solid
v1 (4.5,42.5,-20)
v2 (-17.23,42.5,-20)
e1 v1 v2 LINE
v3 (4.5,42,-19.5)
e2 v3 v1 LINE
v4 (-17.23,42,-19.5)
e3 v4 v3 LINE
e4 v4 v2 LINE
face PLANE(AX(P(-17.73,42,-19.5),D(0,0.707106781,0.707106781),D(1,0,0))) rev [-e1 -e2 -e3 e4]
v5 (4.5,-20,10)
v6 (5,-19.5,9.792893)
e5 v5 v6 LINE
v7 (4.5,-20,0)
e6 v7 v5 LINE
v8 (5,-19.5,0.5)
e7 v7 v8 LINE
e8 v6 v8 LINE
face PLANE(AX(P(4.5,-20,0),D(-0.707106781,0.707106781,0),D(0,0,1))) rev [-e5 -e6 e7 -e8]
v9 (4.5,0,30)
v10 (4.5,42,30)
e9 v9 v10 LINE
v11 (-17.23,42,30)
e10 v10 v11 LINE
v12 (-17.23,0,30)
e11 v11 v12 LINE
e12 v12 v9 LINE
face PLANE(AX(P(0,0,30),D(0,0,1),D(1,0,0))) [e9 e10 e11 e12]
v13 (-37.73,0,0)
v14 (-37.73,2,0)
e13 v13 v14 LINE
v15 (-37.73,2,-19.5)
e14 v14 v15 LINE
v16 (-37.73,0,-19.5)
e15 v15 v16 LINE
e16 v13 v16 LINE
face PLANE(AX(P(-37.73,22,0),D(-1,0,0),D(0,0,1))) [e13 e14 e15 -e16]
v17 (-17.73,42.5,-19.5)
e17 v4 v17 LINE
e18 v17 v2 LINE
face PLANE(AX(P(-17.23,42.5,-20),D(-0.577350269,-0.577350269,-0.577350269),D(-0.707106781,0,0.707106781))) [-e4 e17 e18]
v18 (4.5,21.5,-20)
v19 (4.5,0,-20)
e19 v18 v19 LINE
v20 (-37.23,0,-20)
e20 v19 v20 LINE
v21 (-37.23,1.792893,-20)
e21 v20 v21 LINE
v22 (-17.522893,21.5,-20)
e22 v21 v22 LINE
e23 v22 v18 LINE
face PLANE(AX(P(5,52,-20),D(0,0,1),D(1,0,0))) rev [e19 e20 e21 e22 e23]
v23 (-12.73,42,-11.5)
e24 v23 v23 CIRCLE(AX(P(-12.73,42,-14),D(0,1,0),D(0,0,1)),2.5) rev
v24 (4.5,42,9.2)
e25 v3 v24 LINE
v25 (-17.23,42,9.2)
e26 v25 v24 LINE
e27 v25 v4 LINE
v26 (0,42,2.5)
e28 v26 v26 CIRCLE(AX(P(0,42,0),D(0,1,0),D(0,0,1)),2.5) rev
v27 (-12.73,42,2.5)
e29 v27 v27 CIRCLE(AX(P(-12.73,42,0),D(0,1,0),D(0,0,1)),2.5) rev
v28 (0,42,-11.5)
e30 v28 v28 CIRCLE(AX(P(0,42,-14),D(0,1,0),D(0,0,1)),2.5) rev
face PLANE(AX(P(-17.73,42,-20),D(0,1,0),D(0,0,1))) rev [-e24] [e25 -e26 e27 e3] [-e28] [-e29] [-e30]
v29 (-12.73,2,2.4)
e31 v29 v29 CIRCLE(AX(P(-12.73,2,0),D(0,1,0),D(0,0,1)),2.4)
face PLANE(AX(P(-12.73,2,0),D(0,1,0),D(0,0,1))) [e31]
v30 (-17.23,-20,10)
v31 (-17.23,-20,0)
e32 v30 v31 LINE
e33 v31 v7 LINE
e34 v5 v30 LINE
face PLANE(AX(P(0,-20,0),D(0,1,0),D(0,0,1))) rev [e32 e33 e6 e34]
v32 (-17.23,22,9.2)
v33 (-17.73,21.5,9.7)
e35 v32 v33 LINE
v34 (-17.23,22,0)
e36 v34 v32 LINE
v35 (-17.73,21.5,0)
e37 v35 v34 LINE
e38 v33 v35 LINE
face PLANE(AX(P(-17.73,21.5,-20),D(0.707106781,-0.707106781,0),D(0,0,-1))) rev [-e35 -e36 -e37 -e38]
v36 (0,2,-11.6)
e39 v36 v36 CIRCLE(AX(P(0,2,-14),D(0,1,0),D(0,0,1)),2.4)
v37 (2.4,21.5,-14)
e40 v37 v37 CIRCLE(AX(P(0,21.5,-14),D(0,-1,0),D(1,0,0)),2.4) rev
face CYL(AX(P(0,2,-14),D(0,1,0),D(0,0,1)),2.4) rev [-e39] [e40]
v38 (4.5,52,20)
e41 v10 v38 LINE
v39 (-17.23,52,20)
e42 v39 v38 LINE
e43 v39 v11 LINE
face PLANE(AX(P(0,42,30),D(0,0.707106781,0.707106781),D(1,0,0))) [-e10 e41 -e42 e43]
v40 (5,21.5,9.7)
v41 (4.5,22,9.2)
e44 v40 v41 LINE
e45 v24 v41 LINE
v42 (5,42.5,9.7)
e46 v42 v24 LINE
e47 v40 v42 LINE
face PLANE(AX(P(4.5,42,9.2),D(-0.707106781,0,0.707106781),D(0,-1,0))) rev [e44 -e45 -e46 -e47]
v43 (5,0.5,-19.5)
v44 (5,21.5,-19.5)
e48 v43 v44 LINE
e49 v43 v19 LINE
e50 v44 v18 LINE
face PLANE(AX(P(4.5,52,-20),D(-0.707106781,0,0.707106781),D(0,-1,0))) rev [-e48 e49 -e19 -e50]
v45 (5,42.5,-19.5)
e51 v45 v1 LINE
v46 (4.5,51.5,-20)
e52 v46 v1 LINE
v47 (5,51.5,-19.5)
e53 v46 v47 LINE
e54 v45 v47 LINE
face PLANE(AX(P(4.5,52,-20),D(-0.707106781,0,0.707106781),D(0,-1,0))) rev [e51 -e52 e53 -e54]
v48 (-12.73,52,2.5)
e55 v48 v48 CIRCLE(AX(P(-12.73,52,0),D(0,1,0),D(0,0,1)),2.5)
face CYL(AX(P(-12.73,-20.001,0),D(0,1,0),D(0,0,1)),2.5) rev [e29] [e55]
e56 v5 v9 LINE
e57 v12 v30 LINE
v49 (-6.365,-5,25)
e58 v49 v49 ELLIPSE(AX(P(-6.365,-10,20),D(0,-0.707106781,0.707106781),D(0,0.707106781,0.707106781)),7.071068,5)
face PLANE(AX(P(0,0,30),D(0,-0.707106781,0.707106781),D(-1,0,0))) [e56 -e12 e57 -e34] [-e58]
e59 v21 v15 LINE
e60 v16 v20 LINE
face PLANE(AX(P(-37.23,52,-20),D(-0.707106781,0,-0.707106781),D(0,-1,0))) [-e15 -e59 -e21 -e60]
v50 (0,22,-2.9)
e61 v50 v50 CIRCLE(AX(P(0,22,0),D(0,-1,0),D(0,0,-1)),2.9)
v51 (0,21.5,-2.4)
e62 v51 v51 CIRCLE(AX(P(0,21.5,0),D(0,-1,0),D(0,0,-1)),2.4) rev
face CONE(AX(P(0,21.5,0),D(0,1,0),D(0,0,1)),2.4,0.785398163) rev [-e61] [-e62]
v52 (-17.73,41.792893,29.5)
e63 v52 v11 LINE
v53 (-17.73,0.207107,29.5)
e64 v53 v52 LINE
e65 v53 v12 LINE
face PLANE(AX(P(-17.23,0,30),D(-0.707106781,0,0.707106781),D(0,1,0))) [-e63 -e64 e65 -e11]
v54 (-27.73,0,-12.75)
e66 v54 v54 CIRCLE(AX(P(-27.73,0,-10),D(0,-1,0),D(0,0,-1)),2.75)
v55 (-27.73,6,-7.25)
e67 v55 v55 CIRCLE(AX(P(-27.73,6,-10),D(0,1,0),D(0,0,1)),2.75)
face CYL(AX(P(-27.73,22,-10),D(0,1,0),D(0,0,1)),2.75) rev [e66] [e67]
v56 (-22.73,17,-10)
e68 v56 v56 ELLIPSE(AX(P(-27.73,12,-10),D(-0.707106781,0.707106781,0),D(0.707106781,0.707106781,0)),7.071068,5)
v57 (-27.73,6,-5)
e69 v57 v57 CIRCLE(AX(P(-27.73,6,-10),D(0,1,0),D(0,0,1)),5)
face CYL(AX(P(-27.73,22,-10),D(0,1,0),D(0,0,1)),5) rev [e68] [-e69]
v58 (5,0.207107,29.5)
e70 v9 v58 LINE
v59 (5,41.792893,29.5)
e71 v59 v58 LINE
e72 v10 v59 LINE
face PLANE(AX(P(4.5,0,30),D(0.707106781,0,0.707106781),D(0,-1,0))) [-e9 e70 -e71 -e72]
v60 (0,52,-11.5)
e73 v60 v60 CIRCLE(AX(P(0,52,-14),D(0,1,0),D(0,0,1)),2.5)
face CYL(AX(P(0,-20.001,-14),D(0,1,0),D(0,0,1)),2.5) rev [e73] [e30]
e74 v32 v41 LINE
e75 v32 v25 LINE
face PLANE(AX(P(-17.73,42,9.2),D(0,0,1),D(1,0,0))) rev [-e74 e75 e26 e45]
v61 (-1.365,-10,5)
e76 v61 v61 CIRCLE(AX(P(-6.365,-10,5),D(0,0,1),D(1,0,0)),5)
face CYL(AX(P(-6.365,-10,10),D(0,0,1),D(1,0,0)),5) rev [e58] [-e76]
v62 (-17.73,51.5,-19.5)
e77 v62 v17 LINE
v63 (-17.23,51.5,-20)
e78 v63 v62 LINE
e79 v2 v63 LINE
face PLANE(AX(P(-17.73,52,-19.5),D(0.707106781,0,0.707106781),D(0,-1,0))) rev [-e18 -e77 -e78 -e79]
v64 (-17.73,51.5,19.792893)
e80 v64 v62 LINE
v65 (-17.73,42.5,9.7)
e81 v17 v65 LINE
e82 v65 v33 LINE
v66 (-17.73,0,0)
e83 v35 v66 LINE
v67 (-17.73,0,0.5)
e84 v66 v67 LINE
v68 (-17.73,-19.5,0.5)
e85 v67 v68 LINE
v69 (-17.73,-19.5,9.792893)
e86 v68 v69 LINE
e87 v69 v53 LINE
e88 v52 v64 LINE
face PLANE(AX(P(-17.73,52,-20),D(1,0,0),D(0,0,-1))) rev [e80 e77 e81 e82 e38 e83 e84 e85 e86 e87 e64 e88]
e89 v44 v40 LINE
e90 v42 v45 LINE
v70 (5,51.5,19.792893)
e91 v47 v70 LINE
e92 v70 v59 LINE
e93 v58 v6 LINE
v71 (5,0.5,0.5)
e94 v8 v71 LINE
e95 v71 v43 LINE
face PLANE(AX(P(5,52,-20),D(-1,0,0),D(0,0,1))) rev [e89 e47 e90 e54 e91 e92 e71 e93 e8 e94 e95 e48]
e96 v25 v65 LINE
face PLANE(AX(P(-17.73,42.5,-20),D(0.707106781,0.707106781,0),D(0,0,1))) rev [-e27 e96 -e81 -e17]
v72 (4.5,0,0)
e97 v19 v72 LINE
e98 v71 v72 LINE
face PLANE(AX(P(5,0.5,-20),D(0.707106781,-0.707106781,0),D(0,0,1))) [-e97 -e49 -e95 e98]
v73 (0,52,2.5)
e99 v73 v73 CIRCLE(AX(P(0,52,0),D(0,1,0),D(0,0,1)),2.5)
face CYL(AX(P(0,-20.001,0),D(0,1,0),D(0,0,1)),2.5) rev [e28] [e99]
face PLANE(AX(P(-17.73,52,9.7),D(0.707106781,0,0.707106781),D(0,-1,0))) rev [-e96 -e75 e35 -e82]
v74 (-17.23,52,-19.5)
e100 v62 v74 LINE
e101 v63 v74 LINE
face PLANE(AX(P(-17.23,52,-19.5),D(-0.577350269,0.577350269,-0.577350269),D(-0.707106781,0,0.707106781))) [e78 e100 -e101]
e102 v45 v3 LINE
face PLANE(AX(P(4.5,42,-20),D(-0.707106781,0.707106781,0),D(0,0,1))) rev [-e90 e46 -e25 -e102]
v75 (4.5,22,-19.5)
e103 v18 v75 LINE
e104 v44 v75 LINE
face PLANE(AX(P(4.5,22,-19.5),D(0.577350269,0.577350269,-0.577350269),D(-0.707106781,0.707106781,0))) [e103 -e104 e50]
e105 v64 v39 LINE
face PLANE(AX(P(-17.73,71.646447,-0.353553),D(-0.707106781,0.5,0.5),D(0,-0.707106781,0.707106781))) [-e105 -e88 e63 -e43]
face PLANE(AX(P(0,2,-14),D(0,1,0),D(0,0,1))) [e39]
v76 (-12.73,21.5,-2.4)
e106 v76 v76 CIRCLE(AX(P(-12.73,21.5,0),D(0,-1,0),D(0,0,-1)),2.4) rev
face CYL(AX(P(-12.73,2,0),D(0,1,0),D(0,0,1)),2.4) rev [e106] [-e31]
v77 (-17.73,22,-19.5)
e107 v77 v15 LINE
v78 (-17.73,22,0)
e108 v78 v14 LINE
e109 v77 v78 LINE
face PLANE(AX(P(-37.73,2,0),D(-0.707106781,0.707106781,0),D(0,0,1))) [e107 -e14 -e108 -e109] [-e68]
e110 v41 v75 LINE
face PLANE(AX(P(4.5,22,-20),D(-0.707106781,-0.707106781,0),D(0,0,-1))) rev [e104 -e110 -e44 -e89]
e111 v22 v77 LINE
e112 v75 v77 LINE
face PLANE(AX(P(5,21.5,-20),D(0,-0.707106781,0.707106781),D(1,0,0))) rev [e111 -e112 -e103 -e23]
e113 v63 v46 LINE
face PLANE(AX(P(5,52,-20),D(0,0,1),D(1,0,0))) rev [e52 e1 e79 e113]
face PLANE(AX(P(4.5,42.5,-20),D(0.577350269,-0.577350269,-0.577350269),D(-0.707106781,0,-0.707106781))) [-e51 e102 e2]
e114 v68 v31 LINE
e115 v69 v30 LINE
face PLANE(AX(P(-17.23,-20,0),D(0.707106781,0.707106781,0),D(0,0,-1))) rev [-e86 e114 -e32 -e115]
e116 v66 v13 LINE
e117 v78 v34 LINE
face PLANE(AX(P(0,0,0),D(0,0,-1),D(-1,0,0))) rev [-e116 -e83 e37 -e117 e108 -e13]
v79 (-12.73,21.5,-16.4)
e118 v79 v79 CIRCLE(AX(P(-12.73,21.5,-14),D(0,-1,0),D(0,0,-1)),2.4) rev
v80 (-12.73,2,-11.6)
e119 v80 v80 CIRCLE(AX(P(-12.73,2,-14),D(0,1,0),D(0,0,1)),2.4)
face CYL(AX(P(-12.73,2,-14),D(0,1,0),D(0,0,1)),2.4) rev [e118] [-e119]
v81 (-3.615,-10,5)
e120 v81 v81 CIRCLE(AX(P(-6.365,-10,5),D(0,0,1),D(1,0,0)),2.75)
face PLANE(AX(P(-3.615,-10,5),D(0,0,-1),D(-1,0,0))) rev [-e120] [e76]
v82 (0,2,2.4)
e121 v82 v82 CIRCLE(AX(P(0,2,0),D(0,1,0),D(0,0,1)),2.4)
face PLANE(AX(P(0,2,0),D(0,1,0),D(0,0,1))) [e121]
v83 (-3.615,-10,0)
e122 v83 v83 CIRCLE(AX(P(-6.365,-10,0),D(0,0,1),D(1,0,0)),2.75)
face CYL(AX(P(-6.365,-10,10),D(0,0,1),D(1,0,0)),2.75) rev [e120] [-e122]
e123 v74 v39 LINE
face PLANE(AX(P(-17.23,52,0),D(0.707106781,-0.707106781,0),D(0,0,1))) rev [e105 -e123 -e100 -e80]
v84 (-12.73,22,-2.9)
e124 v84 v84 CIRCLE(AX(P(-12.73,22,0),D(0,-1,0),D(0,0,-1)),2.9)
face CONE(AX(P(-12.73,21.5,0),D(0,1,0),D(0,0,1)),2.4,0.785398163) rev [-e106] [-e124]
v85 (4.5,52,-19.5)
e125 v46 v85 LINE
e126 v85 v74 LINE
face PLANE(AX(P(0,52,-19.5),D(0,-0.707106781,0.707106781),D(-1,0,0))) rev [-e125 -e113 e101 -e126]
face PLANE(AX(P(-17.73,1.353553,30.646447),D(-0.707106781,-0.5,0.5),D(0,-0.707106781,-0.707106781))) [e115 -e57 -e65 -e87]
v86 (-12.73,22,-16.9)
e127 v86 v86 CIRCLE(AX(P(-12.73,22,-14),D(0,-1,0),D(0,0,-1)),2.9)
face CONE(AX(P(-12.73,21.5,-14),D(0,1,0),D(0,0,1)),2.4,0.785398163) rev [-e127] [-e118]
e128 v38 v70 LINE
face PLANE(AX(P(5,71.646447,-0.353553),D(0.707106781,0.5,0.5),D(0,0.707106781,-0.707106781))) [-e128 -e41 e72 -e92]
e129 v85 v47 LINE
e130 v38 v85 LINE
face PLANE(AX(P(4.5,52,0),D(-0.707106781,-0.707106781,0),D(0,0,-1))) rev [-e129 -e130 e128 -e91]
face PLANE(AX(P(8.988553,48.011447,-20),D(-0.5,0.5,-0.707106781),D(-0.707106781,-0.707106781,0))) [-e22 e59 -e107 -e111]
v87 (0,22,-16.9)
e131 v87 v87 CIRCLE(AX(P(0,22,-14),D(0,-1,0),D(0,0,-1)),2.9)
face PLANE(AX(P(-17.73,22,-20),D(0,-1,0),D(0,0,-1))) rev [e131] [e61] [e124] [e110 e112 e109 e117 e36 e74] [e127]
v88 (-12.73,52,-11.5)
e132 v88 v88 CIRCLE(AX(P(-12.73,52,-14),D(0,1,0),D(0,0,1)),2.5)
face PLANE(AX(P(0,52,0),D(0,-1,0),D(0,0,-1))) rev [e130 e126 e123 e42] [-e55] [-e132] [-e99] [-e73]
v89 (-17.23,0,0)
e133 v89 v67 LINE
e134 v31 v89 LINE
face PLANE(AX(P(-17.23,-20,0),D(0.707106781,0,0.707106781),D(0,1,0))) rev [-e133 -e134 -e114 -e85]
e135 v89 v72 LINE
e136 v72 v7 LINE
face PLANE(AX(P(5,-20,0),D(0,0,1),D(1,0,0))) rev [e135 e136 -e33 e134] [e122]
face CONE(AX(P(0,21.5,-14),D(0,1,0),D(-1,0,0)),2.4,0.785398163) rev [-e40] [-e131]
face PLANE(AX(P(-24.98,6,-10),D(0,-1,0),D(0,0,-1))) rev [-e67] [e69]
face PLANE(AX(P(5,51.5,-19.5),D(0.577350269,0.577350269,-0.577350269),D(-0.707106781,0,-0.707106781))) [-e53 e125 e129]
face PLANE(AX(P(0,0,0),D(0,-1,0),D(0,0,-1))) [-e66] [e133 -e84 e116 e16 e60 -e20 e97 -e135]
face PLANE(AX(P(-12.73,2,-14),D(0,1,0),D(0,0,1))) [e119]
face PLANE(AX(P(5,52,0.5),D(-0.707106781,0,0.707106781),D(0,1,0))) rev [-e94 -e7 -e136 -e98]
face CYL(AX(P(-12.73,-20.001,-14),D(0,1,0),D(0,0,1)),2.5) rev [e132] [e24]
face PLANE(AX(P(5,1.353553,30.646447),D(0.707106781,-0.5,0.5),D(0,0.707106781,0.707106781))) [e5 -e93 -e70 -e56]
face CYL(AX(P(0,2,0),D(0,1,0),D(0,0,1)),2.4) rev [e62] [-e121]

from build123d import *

# Parameters (mm, degrees)
SKETCH2_W                      = 22.73
SKETCH2_H                      = 30
BOSS_EXTRUDE1_DEPTH            = 52
SKETCH3_W                      = 22.73
SKETCH3_H                      = 10
BOSS_EXTRUDE2_DEPTH            = 20
CBORE_FOR_M5_SHCS1_D           = 5.5
CBORE_FOR_M5_SHCS1_CBORE_D     = 10
CBORE_FOR_M5_SHCS1_CBORE_DEPTH = 5
BOSS_EXTRUDE3_START            = 20
SKETCH7_W                      = 22.73
SKETCH7_H                      = 72
SKETCH7_R                      = 5
BOSS_EXTRUDE3_DEPTH            = 20
SKETCH8_W                      = 29.2
SKETCH8_H                      = 20
CUT_EXTRUDE1_DEPTH             = 65.192311845
CUT_EXTRUDE2_REACH             = 81.99
SKETCH9_R                      = 2.5
SKETCH10_R                     = 2.4
CUT_EXTRUDE3_DEPTH             = 20
SKETCH12_W                     = 20
SKETCH12_H                     = 22
BOSS_EXTRUDE5_DEPTH            = 20
CBORE_FOR_M5_SHCS2_D           = 5.5
CBORE_FOR_M5_SHCS2_CBORE_D     = 10
CBORE_FOR_M5_SHCS2_CBORE_DEPTH = 16
CHAMFER1_SIZE                  = 20
CHAMFER3_SIZE                  = 10
CHAMFER2_SIZE                  = 0.5


with BuildPart() as part:
    # Sketch2 → Boss-Extrude1 (new body)
    with BuildSketch(Plane(origin=(0, 0, 0), x_dir=(1, 0, 0), z_dir=(0, 1, 0))):
        with Locations((-6.365, 5)):
            Rectangle(SKETCH2_W, SKETCH2_H)
    extrude(amount=BOSS_EXTRUDE1_DEPTH)

    # Sketch3 → Boss-Extrude2 (add)
    with BuildSketch(Plane.XZ):
        with Locations((-6.365, 5)):
            Rectangle(SKETCH3_W, SKETCH3_H)
    extrude(amount=BOSS_EXTRUDE2_DEPTH)

    # CBORE for M5 SHCS1 (through all)
    with Locations(Plane.XY.offset(10)):
        with Locations((-6.365, -10)):
            CounterBoreHole(CBORE_FOR_M5_SHCS1_D / 2, CBORE_FOR_M5_SHCS1_CBORE_D / 2, CBORE_FOR_M5_SHCS1_CBORE_DEPTH)

    # Sketch7 → Boss-Extrude3 (add)
    with BuildSketch(Plane.XY.offset(10).offset(BOSS_EXTRUDE3_START)):
        with Locations((-6.365, 16)):
            Rectangle(SKETCH7_W, SKETCH7_H)
        with Locations((-6.365, -10)):
            Circle(SKETCH7_R, mode=Mode.SUBTRACT)
    extrude(amount=-BOSS_EXTRUDE3_DEPTH)

    # Sketch8 → Cut-Extrude1 (cut, through all)
    with BuildSketch(Plane(origin=(5, 0, 0), x_dir=(0, 0, -1), z_dir=(1, 0, 0))):
        with Locations((5.4, 32)):
            Rectangle(SKETCH8_W, SKETCH8_H)
    extrude(amount=-CUT_EXTRUDE1_DEPTH, mode=Mode.SUBTRACT)

    # Sketch9 → Cut-Extrude2 (cut, up to next)
    with BuildSketch(Plane(origin=(0, 52, 0), x_dir=(1, 0, 0), z_dir=(0, 1, 0)), mode=Mode.PRIVATE) as cut_extrude2_sk1:
        with Locations(Location((-12.73, 0, 0), (0, 0, 270))):
            Circle(SKETCH9_R)
    cut_extrude2_tool1 = extrude(cut_extrude2_sk1.sketch, amount=-CUT_EXTRUDE2_REACH, mode=Mode.PRIVATE) & part.part
    # Sketch9 → Cut-Extrude2 (cut, up to next)
    with BuildSketch(Plane(origin=(0, 52, 0), x_dir=(1, 0, 0), z_dir=(0, 1, 0)), mode=Mode.PRIVATE) as cut_extrude2_sk2:
        with Locations(Location((0, 14, 0), (0, 0, 270))):
            Circle(SKETCH9_R)
    cut_extrude2_tool2 = extrude(cut_extrude2_sk2.sketch, amount=-CUT_EXTRUDE2_REACH, mode=Mode.PRIVATE) & part.part
    # Sketch9 → Cut-Extrude2 (cut, up to next)
    with BuildSketch(Plane(origin=(0, 52, 0), x_dir=(1, 0, 0), z_dir=(0, 1, 0)), mode=Mode.PRIVATE) as cut_extrude2_sk3:
        with Locations(Location((-12.73, 14, 0), (0, 0, 270))):
            Circle(SKETCH9_R)
    cut_extrude2_tool3 = extrude(cut_extrude2_sk3.sketch, amount=-CUT_EXTRUDE2_REACH, mode=Mode.PRIVATE) & part.part
    # Sketch9 → Cut-Extrude2 (cut, up to next)
    with BuildSketch(Plane(origin=(0, 52, 0), x_dir=(1, 0, 0), z_dir=(0, 1, 0)), mode=Mode.PRIVATE) as cut_extrude2_sk4:
        with Locations(Location((0, 0, 0), (0, 0, 270))):
            Circle(SKETCH9_R)
    cut_extrude2_tool4 = extrude(cut_extrude2_sk4.sketch, amount=-CUT_EXTRUDE2_REACH, mode=Mode.PRIVATE) & part.part
    add(cut_extrude2_tool1.solids().sort_by_distance((-12.73, 52, 0))[0], mode=Mode.SUBTRACT)
    add(cut_extrude2_tool2.solids().sort_by_distance((0, 52, -14))[0], mode=Mode.SUBTRACT)
    add(cut_extrude2_tool3.solids().sort_by_distance((-12.73, 52, -14))[0], mode=Mode.SUBTRACT)
    add(cut_extrude2_tool4.solids().sort_by_distance((0, 52, 0))[0], mode=Mode.SUBTRACT)

    # Sketch10 → Cut-Extrude3 (cut)
    with BuildSketch(Plane(origin=(0, 22, 0), x_dir=(1, 0, 0), z_dir=(0, 1, 0))):
        with Locations(Location((0, 0, 0), (0, 0, 270))):
            Circle(SKETCH10_R)
        with Locations(Location((-12.73, 0, 0), (0, 0, 270))):
            Circle(SKETCH10_R)
        with Locations(Location((-12.73, 14, 0), (0, 0, 270))):
            Circle(SKETCH10_R)
        with Locations(Location((0, 14, 0), (0, 0, 270))):
            Circle(SKETCH10_R)
    extrude(amount=-CUT_EXTRUDE3_DEPTH, mode=Mode.SUBTRACT)

    # Sketch12 → Boss-Extrude5 (add)
    with BuildSketch(Plane(origin=(0, 0, -20), x_dir=(-1, 0, 0), z_dir=(0, 0, -1))):
        with Locations((27.73, 11)):
            Rectangle(SKETCH12_W, SKETCH12_H)
    extrude(amount=-BOSS_EXTRUDE5_DEPTH)

    # CBORE for M5 SHCS2 (through all)
    with Locations(Plane(origin=(0, 22, 0), x_dir=(1, 0, 0), z_dir=(0, 1, 0))):
        with Locations((-27.73, 10)):
            CounterBoreHole(CBORE_FOR_M5_SHCS2_D / 2, CBORE_FOR_M5_SHCS2_CBORE_D / 2, CBORE_FOR_M5_SHCS2_CBORE_DEPTH)

    # Chamfer1
    # the kernel refuses this chamfer: 20 mm, written as the material it takes off along each edge
    with BuildSketch(Plane(origin=(-69.163659759, -20, 30), x_dir=(0, 0.9996219169112968, 0.027495876610586317), z_dir=(1, 0, 0))) as chamfer1_piece_1:
        Polygon((CHAMFER1_SIZE * 0.999621916911, -CHAMFER1_SIZE * 0.0274958766106), (-CHAMFER1_SIZE * 0.0274958766106, -CHAMFER1_SIZE * 0.999621916911), (0, 0), align=None)
    extrude(amount=125.597319519, mode=Mode.SUBTRACT)
    with BuildSketch(Plane(origin=(-37.73, 22, -71.433659759), x_dir=(0.9996219169112968, 0.027495876610586317, 0), z_dir=(0, 0, 1))) as chamfer1_piece_2:
        Polygon((CHAMFER1_SIZE * 0.999621916911, -CHAMFER1_SIZE * 0.0274958766106), (-CHAMFER1_SIZE * 0.0274958766106, -CHAMFER1_SIZE * 0.999621916911), (0, 0), align=None)
    extrude(amount=122.867319519, mode=Mode.SUBTRACT)

    # Chamfer3
    chamfer3_edges = [part.edges().sort_by_distance(p)[0] for p in [
        (-6.365, 52, 30),
    ]]
    chamfer(chamfer3_edges, length=CHAMFER3_SIZE)

    # Chamfer2
    chamfer2_edges = [part.edges().sort_by_distance(p)[0] for p in [
        (5, 52, 0),
        (5, 11, -20),
        (5, 47, -20),
        (5, 0, -10),
        (5, -10, 0),
        (5, -20, 5),
        (5, -10, 20),
        (5, 21, 30),
        (-17.73, -10, 0),
        (-17.73, 47, -20),
        (-17.73, 52, 0),
        (-17.73, 21, 30),
        (-17.73, -10, 20),
        (-17.73, -20, 5),
        (5, 42, -5.4),
        (5, 32, 9.2),
        (5, 22, -5.4),
        (-17.73, 22, 4.6),
        (-17.73, 32, 9.2),
        (-17.73, 42, -5.4),
        (0, 22, -16.4),
        (-12.73, 22, -16.4),
        (-12.73, 22, -2.4),
        (0, 22, -2.4),
        (5, 47, 25),
        (-17.73, 47, 25),
        (-37.73, 1, -20),
        (-27.73, 12, -20),
        (-6.365, 22, -20),
        (-6.365, 42, -20),
        (-6.365, 52, -20),
    ]]
    chamfer(chamfer2_edges, length=CHAMFER2_SIZE)


solid = part.part
